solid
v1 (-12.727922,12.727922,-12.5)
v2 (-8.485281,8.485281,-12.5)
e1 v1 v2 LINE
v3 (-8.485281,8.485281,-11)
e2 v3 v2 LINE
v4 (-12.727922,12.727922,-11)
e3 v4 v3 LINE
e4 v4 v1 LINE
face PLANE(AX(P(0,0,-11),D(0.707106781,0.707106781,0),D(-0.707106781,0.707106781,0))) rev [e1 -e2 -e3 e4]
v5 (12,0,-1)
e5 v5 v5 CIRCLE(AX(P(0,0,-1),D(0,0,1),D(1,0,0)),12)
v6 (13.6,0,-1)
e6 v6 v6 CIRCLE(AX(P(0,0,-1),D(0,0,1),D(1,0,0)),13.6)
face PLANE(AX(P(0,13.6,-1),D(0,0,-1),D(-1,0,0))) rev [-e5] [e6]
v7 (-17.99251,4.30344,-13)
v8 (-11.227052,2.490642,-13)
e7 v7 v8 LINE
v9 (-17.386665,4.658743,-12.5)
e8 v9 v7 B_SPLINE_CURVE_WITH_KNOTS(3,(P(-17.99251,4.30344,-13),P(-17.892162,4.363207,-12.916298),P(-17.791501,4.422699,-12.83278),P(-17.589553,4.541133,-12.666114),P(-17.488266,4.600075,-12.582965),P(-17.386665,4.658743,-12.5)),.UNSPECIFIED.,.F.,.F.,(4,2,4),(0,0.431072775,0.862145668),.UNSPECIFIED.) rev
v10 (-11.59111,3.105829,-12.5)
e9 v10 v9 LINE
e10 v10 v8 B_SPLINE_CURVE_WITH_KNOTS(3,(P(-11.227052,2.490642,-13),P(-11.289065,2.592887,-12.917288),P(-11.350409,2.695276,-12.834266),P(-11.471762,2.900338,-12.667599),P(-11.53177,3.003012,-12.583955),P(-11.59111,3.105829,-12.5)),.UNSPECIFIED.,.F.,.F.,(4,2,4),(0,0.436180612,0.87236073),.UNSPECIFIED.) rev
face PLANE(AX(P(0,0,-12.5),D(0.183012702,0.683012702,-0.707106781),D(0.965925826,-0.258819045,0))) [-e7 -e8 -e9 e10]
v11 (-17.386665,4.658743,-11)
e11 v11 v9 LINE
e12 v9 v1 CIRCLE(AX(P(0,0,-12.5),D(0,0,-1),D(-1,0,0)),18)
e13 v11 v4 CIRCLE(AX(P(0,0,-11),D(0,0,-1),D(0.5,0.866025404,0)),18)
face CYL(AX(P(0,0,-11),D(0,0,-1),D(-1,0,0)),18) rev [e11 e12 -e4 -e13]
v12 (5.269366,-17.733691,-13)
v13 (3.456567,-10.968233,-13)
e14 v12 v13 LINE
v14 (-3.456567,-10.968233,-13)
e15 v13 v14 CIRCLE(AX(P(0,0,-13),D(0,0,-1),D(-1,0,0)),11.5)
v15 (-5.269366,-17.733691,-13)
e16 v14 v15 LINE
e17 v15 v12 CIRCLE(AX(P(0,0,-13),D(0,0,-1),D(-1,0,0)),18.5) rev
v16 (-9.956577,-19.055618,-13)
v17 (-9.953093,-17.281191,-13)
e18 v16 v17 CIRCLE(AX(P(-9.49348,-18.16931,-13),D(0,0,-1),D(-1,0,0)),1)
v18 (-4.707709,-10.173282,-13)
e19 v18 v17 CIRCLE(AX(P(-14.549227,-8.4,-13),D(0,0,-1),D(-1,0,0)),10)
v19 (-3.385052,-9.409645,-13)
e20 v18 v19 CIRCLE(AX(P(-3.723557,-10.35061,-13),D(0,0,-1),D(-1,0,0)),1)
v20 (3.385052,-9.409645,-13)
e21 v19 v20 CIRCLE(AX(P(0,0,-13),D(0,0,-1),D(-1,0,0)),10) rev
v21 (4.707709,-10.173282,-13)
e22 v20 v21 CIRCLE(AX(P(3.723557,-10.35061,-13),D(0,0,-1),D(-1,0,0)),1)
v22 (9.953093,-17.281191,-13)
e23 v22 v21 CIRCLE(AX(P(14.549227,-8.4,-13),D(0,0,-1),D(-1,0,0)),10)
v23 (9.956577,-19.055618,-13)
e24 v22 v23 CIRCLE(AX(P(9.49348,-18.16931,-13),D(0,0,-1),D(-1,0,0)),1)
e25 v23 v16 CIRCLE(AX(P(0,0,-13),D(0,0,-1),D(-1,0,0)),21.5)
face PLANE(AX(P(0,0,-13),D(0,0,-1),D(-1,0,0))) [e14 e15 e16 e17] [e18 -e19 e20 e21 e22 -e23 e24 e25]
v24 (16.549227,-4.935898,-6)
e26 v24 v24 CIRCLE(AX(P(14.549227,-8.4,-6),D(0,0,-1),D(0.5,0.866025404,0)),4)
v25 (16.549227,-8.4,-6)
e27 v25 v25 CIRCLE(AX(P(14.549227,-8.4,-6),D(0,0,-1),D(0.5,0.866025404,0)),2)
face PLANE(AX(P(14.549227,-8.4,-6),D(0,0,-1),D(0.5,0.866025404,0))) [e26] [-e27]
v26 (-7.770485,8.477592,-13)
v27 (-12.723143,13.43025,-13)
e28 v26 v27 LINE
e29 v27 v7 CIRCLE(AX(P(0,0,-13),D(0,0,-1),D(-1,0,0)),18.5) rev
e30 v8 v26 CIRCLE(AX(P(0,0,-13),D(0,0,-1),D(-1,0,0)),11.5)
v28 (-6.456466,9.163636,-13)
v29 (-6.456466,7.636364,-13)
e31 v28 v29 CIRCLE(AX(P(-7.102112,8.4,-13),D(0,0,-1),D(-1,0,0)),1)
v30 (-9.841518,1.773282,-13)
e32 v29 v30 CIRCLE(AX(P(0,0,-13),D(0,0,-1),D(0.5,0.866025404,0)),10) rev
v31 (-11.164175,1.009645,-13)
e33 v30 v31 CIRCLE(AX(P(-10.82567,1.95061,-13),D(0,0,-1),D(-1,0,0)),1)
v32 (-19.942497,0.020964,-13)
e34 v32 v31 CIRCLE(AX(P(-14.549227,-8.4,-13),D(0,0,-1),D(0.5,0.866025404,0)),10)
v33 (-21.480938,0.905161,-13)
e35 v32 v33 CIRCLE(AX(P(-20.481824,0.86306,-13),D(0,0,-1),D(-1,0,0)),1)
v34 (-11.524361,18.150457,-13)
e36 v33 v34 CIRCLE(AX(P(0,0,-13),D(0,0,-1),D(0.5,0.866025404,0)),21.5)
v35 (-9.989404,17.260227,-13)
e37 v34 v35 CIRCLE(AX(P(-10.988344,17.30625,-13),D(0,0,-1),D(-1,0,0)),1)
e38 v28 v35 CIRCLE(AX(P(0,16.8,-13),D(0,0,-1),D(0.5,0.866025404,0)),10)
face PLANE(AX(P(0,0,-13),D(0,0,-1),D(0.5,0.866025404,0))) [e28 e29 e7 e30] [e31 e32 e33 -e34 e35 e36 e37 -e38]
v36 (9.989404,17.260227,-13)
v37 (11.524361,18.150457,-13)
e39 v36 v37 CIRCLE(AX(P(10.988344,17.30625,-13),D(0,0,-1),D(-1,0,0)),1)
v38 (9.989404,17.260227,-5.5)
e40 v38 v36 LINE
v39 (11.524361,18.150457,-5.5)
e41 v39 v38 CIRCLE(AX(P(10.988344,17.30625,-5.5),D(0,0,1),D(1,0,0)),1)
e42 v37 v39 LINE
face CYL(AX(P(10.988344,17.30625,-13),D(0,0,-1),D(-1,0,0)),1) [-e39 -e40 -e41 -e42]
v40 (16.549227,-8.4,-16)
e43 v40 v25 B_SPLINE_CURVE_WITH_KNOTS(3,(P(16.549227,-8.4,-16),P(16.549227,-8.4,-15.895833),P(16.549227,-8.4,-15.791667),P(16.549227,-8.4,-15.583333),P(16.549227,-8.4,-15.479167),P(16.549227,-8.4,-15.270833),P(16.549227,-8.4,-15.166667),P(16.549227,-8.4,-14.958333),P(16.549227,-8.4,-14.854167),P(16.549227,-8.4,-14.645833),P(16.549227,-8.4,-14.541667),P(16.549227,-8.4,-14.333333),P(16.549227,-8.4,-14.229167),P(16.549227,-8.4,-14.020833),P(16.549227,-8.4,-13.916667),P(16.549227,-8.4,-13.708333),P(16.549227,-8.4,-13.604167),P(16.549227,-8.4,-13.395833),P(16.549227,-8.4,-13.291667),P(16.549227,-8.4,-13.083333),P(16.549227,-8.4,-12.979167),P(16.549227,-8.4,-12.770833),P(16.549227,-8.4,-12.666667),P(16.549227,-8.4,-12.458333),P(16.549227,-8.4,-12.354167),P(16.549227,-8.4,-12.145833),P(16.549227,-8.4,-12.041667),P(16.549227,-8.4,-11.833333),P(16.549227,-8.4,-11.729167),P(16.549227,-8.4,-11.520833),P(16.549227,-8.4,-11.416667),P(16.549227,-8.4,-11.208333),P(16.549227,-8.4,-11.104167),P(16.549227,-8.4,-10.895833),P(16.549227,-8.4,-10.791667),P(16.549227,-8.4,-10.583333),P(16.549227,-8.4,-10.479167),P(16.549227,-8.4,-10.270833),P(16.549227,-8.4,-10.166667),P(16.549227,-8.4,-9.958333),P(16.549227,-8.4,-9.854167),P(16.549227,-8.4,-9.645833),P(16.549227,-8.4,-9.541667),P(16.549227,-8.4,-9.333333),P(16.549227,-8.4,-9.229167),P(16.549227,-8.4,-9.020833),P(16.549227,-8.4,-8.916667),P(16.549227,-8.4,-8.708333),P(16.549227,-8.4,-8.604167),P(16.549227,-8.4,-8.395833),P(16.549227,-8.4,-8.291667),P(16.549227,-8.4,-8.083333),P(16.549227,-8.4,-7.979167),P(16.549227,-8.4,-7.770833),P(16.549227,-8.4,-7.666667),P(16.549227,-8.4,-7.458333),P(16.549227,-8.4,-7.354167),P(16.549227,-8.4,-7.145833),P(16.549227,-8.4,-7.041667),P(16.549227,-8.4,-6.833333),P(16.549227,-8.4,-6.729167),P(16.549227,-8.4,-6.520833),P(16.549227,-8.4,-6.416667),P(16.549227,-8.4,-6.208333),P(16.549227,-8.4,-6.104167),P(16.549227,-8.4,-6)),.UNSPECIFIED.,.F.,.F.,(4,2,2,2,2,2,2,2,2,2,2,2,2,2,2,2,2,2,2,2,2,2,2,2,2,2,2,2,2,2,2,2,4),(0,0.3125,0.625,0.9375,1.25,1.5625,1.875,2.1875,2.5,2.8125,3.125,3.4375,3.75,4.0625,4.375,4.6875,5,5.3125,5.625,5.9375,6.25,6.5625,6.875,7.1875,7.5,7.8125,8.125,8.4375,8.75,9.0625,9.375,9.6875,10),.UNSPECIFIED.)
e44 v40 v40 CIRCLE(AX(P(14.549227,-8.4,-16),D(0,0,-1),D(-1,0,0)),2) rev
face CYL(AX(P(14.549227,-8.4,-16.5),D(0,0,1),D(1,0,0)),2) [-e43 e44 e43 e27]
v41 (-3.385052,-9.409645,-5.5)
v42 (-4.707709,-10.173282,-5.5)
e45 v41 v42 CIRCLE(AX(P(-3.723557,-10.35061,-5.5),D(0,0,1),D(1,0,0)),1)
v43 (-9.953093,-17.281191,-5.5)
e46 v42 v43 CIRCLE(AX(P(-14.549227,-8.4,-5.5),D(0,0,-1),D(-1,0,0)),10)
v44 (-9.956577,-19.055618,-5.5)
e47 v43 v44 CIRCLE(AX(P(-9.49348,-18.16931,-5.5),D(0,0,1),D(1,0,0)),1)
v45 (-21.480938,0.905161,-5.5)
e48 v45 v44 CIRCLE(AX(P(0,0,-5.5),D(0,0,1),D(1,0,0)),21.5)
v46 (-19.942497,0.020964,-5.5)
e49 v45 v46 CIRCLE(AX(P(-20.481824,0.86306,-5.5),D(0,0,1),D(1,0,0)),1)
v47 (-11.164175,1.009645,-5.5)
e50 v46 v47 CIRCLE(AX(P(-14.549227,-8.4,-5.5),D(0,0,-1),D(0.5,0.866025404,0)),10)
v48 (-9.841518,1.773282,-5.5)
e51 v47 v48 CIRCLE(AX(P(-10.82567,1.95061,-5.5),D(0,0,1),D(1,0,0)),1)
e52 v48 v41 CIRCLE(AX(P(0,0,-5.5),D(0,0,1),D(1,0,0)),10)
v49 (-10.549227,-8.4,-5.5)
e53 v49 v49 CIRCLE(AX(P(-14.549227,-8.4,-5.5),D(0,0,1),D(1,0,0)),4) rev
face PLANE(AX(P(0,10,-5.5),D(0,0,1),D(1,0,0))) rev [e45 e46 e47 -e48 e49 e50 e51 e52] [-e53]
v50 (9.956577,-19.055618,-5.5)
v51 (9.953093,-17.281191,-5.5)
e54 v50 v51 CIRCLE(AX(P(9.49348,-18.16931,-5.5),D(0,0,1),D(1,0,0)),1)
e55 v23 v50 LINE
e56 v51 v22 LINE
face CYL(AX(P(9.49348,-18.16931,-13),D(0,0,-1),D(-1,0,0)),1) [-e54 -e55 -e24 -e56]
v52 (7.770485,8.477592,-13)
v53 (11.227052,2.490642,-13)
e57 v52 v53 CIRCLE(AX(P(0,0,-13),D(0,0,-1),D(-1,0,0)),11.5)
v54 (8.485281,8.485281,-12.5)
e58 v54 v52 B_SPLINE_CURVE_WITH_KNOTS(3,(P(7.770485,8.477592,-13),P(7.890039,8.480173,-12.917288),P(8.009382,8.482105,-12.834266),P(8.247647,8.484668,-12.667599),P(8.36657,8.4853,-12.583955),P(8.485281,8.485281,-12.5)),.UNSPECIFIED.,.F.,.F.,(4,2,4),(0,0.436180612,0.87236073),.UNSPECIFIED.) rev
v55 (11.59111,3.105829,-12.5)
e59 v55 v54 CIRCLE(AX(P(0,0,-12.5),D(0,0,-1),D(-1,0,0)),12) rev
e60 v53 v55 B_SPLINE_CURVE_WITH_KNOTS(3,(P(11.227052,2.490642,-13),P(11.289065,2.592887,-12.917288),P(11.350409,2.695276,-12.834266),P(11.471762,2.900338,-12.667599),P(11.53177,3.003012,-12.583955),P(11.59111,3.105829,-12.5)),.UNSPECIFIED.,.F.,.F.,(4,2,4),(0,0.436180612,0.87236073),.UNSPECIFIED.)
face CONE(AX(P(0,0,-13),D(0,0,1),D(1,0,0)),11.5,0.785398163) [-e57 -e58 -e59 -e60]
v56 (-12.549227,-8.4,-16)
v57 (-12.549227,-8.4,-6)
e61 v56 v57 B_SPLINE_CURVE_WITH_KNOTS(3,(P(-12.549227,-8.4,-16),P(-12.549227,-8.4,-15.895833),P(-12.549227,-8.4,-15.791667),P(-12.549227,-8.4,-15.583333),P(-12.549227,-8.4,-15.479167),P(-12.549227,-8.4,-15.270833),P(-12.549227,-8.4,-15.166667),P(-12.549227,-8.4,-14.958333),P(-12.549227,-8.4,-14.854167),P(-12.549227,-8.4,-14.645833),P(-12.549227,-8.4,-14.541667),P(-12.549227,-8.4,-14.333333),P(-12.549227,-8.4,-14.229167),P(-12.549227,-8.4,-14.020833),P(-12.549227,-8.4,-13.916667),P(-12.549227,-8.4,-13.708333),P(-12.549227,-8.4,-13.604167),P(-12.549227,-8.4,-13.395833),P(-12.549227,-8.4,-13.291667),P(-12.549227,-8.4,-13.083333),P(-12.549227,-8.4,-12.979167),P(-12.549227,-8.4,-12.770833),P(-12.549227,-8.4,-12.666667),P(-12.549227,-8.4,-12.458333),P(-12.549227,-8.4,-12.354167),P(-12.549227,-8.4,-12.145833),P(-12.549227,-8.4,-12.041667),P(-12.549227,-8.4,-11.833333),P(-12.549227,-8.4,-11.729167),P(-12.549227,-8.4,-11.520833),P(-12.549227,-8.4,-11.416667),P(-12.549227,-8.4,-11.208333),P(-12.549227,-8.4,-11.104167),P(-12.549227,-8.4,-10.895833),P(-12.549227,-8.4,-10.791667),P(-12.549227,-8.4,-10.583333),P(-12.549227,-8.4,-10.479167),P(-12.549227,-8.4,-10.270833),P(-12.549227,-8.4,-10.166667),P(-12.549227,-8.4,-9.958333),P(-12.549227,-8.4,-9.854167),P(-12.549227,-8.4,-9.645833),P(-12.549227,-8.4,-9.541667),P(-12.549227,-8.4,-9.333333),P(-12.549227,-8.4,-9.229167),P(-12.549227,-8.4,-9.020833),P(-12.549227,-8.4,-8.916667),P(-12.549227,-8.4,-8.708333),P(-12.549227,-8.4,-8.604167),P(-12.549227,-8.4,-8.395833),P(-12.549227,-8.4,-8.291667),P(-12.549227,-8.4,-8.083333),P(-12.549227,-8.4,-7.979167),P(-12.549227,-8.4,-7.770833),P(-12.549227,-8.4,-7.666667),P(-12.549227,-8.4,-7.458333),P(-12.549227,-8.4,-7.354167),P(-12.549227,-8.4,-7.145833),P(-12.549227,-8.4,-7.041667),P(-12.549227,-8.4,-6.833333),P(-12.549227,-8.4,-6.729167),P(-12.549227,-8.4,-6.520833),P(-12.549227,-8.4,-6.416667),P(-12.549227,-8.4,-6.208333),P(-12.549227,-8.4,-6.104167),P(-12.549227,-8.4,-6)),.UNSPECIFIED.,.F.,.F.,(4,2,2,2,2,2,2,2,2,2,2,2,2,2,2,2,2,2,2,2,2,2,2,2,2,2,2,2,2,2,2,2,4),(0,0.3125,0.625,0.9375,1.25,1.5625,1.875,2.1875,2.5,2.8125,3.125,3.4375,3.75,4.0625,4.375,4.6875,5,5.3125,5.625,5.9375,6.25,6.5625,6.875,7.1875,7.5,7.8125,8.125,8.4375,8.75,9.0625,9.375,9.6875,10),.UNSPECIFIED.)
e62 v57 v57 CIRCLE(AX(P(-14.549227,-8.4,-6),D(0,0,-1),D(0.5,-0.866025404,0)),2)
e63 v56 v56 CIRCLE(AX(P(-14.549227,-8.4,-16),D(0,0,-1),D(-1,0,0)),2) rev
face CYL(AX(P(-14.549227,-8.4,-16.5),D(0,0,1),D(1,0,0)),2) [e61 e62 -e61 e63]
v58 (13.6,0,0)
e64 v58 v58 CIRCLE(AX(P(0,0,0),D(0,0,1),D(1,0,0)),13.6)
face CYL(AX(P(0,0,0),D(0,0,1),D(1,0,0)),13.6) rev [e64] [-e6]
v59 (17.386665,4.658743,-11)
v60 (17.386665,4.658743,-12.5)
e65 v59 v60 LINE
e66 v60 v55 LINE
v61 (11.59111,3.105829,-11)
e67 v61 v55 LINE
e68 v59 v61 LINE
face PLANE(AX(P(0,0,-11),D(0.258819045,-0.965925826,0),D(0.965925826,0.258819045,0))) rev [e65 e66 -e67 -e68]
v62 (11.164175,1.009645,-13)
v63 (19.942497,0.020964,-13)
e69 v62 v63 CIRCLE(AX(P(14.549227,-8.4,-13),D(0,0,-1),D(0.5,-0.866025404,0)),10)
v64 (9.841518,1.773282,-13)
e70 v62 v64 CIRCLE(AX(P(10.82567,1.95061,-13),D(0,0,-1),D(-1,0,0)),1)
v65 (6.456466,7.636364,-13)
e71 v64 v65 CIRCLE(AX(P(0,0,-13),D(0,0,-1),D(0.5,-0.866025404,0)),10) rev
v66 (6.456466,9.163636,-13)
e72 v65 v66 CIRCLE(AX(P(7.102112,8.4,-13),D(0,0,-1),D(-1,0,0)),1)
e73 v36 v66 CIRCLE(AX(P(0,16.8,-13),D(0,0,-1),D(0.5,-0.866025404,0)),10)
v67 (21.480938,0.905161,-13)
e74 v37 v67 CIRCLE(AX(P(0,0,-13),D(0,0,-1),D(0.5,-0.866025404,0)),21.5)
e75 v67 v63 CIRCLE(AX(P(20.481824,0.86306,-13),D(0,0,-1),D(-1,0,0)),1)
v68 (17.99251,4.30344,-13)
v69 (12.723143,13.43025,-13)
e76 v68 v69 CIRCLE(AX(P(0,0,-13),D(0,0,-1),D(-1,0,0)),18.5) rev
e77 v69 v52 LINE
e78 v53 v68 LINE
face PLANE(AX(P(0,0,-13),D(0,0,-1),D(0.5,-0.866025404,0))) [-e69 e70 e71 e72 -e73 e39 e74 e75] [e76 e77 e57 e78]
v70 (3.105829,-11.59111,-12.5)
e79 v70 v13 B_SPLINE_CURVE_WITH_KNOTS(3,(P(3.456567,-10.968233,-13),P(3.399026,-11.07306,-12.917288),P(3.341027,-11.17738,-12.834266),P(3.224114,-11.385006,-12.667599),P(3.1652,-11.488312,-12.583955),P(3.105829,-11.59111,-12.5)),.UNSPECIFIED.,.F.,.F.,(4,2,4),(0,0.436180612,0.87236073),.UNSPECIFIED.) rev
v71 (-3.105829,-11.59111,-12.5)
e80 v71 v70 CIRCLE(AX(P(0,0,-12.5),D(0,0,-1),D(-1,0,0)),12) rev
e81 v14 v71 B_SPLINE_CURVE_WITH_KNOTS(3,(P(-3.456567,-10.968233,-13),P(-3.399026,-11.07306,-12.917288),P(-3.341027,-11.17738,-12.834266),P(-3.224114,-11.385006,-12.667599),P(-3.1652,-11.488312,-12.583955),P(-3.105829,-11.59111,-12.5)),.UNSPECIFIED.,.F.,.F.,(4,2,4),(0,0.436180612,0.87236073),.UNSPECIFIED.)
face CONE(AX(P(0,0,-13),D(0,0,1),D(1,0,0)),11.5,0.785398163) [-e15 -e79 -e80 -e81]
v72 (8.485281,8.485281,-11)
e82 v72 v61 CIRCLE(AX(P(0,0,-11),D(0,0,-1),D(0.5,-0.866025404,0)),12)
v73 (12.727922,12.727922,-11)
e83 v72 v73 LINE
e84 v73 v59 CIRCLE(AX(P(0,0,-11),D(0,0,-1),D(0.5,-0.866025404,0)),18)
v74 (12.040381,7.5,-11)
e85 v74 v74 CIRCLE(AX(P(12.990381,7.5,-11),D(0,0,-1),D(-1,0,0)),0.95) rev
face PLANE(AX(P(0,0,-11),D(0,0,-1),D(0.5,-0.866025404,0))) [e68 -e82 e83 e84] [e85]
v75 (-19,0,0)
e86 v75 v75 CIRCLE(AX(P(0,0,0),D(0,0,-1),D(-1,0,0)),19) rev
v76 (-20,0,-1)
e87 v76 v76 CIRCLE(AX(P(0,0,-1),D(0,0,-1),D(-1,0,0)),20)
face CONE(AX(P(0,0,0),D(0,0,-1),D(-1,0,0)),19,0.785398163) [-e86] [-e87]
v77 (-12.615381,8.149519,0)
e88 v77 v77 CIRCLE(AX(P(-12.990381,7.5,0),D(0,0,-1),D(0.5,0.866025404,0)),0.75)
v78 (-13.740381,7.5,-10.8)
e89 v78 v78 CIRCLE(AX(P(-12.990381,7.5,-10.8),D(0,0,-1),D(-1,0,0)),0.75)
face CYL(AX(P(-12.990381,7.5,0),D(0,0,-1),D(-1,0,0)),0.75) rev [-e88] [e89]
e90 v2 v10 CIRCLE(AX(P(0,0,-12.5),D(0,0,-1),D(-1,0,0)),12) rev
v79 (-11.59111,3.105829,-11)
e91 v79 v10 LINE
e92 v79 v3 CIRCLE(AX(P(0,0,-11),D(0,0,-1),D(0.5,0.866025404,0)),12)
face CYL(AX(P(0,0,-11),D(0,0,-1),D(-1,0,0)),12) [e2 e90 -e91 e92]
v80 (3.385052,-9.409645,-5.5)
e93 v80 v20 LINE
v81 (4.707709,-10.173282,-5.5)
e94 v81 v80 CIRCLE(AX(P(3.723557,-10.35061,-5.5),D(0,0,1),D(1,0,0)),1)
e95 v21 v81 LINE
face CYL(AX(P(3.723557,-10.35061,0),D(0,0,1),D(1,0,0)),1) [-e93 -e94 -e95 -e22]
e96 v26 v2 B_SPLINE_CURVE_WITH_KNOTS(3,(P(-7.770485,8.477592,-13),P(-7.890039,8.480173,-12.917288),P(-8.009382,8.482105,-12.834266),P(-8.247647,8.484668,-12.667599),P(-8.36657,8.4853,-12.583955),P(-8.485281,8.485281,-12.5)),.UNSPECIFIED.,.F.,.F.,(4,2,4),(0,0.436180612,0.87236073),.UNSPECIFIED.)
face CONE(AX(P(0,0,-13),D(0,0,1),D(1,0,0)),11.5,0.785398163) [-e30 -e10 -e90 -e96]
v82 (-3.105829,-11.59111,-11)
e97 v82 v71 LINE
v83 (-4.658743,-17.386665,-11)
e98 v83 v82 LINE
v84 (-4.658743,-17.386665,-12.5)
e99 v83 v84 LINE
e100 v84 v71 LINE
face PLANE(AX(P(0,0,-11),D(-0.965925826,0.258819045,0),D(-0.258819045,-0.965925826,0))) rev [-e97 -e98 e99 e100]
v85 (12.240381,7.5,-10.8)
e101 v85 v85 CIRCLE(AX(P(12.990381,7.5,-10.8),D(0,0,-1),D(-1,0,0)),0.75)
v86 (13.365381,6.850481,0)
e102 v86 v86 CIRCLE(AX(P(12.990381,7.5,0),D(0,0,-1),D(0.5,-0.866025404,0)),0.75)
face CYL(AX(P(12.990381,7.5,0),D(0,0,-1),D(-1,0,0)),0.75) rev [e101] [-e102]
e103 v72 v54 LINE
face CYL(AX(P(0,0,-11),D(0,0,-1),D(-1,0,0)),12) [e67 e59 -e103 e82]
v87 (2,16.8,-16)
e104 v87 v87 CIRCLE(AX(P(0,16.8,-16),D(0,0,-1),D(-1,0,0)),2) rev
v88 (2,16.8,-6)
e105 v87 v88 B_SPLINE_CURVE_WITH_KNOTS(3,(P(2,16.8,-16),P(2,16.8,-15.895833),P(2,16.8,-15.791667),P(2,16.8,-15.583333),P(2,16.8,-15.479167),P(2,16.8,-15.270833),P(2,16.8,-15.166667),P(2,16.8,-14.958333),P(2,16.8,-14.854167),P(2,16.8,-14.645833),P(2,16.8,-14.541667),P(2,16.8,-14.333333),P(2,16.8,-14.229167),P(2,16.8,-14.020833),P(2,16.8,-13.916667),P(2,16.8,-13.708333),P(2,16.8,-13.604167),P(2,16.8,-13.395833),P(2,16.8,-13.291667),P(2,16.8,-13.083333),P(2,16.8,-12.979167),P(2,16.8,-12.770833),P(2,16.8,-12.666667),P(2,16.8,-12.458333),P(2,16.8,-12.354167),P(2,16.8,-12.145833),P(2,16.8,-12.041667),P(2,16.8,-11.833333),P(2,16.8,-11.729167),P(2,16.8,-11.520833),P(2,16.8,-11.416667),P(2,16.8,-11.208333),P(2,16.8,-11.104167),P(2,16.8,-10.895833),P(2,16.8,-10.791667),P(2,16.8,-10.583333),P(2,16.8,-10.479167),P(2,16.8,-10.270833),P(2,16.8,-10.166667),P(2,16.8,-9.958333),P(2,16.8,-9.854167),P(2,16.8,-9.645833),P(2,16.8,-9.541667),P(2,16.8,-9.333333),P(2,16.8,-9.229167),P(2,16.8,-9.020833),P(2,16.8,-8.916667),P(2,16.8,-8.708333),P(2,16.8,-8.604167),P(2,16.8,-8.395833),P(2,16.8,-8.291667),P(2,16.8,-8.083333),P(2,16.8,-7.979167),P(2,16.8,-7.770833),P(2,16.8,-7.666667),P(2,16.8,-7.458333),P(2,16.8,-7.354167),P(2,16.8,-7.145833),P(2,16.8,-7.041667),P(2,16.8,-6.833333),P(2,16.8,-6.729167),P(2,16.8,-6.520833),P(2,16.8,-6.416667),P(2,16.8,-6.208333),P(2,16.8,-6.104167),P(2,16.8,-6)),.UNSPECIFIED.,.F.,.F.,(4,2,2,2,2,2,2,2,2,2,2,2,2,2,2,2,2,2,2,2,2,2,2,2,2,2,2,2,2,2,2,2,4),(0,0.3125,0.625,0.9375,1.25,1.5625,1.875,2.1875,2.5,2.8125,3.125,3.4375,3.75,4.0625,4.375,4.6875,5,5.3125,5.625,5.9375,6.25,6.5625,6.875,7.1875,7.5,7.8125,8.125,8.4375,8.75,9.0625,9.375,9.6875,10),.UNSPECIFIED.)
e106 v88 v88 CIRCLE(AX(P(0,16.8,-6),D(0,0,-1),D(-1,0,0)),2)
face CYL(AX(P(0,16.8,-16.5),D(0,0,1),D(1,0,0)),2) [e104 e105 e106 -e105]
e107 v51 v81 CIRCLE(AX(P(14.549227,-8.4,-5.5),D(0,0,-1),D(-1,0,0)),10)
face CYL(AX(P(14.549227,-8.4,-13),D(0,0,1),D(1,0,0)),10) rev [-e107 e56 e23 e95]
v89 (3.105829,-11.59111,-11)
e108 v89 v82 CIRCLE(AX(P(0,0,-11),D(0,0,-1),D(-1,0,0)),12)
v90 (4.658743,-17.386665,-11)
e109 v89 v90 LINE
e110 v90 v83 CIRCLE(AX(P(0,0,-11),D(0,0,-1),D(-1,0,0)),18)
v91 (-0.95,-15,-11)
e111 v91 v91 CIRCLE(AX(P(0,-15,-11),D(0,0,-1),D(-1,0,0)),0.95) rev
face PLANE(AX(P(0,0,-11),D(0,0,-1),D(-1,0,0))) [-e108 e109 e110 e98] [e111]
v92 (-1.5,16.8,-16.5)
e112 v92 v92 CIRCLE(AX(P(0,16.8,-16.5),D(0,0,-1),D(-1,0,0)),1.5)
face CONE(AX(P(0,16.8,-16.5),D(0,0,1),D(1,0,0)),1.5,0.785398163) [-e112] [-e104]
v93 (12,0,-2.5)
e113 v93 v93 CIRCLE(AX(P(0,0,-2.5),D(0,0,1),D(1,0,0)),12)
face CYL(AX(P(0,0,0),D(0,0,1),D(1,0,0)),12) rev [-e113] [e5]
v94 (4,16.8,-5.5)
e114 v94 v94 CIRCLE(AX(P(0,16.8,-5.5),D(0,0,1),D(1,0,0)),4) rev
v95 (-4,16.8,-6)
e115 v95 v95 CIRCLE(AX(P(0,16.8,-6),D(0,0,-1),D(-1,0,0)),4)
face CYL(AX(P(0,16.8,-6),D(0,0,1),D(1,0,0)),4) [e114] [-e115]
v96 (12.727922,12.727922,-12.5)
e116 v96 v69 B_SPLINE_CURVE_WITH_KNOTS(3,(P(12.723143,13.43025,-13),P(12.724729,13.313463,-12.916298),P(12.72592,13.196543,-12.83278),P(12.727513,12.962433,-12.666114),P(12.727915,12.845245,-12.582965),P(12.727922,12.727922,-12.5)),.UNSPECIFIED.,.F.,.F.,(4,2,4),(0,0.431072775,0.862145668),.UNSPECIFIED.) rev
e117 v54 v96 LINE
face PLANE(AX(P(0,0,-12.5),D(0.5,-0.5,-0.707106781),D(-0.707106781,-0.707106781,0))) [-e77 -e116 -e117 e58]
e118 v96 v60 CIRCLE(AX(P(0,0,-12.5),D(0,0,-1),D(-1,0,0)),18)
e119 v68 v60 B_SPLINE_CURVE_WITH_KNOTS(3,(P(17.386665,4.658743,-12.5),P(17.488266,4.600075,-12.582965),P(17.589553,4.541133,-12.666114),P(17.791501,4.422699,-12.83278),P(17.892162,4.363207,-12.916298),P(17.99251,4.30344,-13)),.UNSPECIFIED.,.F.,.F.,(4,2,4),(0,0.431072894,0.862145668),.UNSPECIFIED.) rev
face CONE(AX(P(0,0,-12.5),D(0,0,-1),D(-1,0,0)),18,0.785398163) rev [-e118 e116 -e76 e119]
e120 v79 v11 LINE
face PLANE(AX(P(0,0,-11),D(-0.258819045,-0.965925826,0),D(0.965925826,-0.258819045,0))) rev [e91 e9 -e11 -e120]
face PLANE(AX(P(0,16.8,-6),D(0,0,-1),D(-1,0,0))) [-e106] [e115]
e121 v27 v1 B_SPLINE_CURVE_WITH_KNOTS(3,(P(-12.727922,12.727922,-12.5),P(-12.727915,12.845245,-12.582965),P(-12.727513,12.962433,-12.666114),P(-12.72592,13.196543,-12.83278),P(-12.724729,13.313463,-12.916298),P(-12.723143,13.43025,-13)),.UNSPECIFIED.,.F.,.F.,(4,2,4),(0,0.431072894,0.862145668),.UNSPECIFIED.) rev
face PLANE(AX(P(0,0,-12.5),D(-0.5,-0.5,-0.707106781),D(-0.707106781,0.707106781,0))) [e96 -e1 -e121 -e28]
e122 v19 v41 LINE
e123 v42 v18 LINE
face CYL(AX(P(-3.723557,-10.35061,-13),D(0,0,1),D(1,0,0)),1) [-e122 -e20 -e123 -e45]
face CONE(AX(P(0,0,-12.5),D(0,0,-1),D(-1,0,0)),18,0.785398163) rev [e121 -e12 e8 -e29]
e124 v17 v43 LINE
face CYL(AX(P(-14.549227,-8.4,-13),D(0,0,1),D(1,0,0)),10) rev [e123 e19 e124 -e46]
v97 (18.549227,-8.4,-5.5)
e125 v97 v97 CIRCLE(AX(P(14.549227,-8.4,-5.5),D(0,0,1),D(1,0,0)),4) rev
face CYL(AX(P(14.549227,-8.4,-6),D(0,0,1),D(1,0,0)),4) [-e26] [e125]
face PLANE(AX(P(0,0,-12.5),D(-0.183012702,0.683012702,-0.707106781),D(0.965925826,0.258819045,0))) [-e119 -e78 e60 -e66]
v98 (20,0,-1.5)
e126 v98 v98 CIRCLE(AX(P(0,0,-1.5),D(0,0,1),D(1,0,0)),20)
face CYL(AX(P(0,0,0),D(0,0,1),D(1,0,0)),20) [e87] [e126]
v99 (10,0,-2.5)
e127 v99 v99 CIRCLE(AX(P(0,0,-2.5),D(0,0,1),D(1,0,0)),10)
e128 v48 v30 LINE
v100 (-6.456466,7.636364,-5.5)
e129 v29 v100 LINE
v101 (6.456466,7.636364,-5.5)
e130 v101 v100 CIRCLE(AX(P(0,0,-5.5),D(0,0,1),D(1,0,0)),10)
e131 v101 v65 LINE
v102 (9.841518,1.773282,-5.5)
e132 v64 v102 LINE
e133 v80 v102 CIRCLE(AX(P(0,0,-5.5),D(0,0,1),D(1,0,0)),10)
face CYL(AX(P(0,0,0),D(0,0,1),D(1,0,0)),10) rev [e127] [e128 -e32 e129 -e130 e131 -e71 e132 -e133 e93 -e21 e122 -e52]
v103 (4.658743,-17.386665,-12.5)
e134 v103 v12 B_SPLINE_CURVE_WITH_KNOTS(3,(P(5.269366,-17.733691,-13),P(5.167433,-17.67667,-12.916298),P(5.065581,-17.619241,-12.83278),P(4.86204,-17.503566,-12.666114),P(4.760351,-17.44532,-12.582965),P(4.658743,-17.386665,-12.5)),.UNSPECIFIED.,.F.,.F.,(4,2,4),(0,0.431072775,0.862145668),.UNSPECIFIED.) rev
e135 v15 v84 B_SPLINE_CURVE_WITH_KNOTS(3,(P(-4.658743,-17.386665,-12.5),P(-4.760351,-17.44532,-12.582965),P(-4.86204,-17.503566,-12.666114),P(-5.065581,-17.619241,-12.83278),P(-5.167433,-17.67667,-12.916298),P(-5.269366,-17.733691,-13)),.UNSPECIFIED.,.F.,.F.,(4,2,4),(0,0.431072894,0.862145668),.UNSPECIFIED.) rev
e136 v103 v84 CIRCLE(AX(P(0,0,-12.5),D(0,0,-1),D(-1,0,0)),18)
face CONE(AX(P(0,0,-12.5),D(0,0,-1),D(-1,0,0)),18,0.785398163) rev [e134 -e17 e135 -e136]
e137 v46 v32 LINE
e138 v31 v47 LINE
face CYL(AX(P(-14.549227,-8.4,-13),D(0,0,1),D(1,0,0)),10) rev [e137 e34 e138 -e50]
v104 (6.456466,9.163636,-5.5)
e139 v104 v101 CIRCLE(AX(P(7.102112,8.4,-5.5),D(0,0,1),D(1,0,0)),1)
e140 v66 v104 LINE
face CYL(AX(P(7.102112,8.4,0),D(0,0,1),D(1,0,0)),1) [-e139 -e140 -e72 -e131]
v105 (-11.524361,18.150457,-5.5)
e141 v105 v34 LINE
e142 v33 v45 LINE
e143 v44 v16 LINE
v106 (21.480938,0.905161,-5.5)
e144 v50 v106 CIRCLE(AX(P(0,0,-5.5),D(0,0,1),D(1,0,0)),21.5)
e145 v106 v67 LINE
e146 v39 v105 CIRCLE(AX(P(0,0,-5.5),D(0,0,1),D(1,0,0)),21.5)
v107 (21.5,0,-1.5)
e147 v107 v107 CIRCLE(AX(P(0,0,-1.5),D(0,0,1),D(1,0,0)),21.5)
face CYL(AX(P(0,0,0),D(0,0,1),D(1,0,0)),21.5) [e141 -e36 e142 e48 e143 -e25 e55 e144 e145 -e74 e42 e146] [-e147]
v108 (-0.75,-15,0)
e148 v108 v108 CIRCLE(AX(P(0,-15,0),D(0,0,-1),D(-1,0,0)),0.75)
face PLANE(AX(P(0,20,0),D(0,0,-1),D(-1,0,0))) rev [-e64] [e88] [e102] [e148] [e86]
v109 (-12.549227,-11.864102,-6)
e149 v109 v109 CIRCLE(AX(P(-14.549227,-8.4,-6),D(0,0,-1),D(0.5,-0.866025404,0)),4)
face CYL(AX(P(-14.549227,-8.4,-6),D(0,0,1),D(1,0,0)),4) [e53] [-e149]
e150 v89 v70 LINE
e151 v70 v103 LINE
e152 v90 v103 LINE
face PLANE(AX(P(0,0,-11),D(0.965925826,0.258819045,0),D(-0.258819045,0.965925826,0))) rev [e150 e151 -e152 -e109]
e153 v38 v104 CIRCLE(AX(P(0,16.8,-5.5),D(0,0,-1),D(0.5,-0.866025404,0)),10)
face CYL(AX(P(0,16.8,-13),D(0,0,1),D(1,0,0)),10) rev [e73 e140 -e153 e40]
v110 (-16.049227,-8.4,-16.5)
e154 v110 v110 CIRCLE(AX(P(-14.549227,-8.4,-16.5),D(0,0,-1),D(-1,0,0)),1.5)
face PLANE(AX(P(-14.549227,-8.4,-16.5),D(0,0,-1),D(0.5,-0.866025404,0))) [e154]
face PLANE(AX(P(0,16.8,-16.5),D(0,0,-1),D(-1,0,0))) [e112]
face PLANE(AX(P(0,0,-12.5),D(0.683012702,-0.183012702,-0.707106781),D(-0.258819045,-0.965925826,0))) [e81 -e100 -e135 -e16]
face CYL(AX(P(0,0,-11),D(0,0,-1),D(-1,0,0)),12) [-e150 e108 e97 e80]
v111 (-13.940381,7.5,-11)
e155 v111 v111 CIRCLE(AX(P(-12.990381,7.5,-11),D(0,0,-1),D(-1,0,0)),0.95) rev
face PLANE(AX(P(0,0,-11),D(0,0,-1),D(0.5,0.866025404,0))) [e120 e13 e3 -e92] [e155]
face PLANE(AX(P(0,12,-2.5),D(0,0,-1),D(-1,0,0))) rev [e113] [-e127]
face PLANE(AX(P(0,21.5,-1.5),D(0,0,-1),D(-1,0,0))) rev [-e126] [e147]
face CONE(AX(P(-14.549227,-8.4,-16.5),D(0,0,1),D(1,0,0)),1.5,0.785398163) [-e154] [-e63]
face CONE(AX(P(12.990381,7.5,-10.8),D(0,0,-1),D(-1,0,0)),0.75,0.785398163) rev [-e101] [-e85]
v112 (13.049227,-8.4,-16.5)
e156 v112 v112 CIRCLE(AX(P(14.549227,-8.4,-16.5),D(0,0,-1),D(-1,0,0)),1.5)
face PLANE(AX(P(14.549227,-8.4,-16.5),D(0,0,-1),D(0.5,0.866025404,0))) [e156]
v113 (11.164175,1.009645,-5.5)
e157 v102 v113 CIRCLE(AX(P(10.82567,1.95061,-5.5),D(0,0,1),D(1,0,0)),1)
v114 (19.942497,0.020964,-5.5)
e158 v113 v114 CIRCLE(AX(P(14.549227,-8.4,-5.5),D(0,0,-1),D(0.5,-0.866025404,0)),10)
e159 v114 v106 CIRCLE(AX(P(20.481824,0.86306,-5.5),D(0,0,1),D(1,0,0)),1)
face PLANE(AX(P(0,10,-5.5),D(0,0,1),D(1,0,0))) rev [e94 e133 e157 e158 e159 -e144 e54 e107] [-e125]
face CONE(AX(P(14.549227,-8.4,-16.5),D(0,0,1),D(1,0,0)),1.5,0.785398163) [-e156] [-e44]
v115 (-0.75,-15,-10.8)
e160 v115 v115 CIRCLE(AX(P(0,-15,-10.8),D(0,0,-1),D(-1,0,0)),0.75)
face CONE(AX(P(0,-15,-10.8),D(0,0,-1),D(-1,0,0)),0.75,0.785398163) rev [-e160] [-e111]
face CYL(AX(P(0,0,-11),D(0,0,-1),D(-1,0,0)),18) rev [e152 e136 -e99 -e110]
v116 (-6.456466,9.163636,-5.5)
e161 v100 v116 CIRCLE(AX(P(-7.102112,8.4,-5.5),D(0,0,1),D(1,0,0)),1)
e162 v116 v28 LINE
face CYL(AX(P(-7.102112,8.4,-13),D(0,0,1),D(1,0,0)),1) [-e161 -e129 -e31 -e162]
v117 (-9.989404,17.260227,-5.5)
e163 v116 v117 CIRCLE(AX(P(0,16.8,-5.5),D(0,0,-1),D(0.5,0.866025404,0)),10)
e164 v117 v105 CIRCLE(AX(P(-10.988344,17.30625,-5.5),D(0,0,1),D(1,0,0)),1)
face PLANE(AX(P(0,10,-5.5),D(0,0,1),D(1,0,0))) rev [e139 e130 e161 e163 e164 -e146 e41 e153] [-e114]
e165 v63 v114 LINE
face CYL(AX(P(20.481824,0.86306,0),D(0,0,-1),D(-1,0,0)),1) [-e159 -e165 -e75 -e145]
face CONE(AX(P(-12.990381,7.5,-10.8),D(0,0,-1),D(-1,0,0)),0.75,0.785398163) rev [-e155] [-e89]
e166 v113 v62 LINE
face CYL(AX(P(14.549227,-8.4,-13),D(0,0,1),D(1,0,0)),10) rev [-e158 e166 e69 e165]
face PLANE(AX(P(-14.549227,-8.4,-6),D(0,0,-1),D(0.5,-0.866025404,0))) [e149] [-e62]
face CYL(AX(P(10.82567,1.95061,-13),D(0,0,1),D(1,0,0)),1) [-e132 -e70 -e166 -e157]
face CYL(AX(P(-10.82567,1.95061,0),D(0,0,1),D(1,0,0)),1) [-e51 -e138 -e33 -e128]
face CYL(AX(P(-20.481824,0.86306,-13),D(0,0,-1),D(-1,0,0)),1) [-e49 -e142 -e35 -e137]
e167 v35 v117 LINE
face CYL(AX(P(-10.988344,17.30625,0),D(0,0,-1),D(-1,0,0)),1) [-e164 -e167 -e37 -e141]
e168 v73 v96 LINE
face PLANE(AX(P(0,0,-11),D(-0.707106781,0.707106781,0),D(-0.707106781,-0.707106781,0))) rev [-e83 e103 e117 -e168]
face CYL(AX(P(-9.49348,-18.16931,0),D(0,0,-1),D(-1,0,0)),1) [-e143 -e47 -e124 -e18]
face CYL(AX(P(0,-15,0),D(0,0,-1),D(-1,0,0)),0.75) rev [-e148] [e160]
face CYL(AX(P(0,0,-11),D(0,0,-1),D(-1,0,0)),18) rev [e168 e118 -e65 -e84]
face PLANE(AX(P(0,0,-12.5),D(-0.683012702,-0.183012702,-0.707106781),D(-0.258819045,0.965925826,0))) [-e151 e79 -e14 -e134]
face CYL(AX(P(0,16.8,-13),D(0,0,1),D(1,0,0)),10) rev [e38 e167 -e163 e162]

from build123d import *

# Parameters (mm, degrees)
SKETCH4_R                    = 4
BOSS_EXTRUDE1_DEPTH          = 0.5
SKETCH5_R                    = 2
BOSS_EXTRUDE2_DEPTH          = 10.5
CHAMFER1_SIZE                = 0.5
CIRPATTERN1_COUNT            = 3
CHAMFER1_OF_CIRPATTERN1_SIZE = 0.5
BOSS_EXTRUDE3_DEPTH          = 7.5
SKETCH7_R                    = 0.75
CUT_EXTRUDE1_DEPTH           = 2
CUT_EXTRUDE2_DEPTH           = 34.068111528
CHAMFER2_SIZE                = 0.2
CHAMFER3_SIZE                = 0.5
CIRPATTERN2_COUNT            = 3
CHAMFER2_OF_CIRPATTERN2_SIZE = 0.2
CHAMFER3_OF_CIRPATTERN2_SIZE = 0.5
CHAMFER4_SIZE                = 1
FILLET1_R                    = 1


with BuildPart() as part:
    # Sketch3 → Revolve1 (revolve)
    with BuildSketch(Plane(origin=(0, 0, 0), x_dir=(0, 0, -1), z_dir=(1, 0, 0)), mode=Mode.PRIVATE) as revolve1_sk:
        Polygon((1, 13.6), (1, 12), (2.5, 12), (2.5, 10), (5.5, 10), (5.5, 21.5), (1.5, 21.5), (1.5, 20), (0, 20), (0, 13.6), align=None)
    revolve(revolve1_sk.sketch.rotate(Axis((0, 0, 0), (0, 0, -1)), 90), axis=Axis((0, 0, 0), (0, 0, -1)))

    # Sketch4 → Boss-Extrude1 (add)
    with BuildSketch(Plane(origin=(0, 0, -5.5), x_dir=(-1, 0, 0), z_dir=(0, 0, -1))):
        with Locations(Location((0, 16.8, 0), (0, 0, 180))):
            Circle(SKETCH4_R)
    boss_extrude1 = extrude(amount=BOSS_EXTRUDE1_DEPTH)

    # Sketch5 → Boss-Extrude2 (add)
    with BuildSketch(Plane(origin=(0, 0, -6), x_dir=(-1, 0, 0), z_dir=(0, 0, -1))):
        with Locations(Location((0, 16.8, 0), (0, 0, 180))):
            Circle(SKETCH5_R)
    boss_extrude2 = extrude(amount=BOSS_EXTRUDE2_DEPTH)

    # Chamfer1
    chamfer1_edges = [part.edges().sort_by_distance(p)[0] for p in [
        (-2, 16.8, -16.5),
    ]]
    chamfer(chamfer1_edges, length=CHAMFER1_SIZE)

    # CirPattern1: Boss-Extrude1, Boss-Extrude2 ×3 about axis
    cirpattern1_axis = Axis((0, 0, 0), (0, 0, 1))
    add([boss_extrude1.rotate(cirpattern1_axis, i * 360 / CIRPATTERN1_COUNT) for i in range(1, CIRPATTERN1_COUNT)])
    add([boss_extrude2.rotate(cirpattern1_axis, i * 360 / CIRPATTERN1_COUNT) for i in range(1, CIRPATTERN1_COUNT)])

    # Chamfer1 of CirPattern1
    chamfer1_of_cirpattern1_edges = [part.edges().sort_by_distance(p)[0] for p in [
        (-13.549226784, -10.132050808, -16.5),
        (15.549226784, -6.667949192, -16.5),
    ]]
    chamfer(chamfer1_of_cirpattern1_edges, length=CHAMFER1_OF_CIRPATTERN1_SIZE)

    # Sketch6 → Boss-Extrude3 (add)
    with BuildSketch(Plane(origin=(0, 0, -5.5), x_dir=(-1, 0, 0), z_dir=(0, 0, -1))):
        with BuildLine():
            ThreePointArc((-4.561681399, -8.89893605), (-6.703398823, -14.60024061), (-11.755277198, -18.001762636))
            ThreePointArc((-11.755277198, -18.001762636), (0, -21.5), (11.755277198, -18.001762636))
            ThreePointArc((11.755277198, -18.001762636), (6.703398823, -14.60024061), (4.561681399, -8.89893605))
            ThreePointArc((4.561681399, -8.89893605), (0, -10), (-4.561681399, -8.89893605))
        make_face()
    boss_extrude3 = extrude(amount=BOSS_EXTRUDE3_DEPTH)

    # Sketch7 → Cut-Extrude1 (cut)
    with BuildSketch(Plane(origin=(0, 0, -13), x_dir=(-1, 0, 0), z_dir=(0, 0, -1))):
        with BuildLine():
            Line((-3.105828541, -11.591109915), (-4.658742812, -17.386664873))
            ThreePointArc((-4.658742812, -17.386664873), (0, -18), (4.658742812, -17.386664873))
            Line((4.658742812, -17.386664873), (3.105828541, -11.591109915))
            ThreePointArc((3.105828541, -11.591109915), (0, -12), (-3.105828541, -11.591109915))
        make_face()
        with Locations((0, -15)):
            Circle(SKETCH7_R, mode=Mode.SUBTRACT)
    cut_extrude1 = extrude(amount=-CUT_EXTRUDE1_DEPTH, mode=Mode.SUBTRACT)

    # Sketch7<3> → Cut-Extrude2 (cut, through all)
    with BuildSketch(Plane(origin=(0, 0, -13), x_dir=(-1, 0, 0), z_dir=(0, 0, -1))):
        with BuildLine():
            ThreePointArc((0.75, -15), (0.530330086, -14.469669914), (0, -14.25))
            Line((0, -14.25), (0, -15.75))
            ThreePointArc((0, -15.75), (0.530330086, -15.530330086), (0.75, -15))
        make_face()
        with BuildLine():
            Line((0, -15.75), (0, -14.25))
            ThreePointArc((0, -14.25), (-0.75, -15), (0, -15.75))
        make_face()
    cut_extrude2 = extrude(amount=-CUT_EXTRUDE2_DEPTH, mode=Mode.SUBTRACT)

    # Chamfer2
    chamfer2_edges = [part.edges().sort_by_distance(p)[0] for p in [
        (0, -15.75, -11),
    ]]
    chamfer(chamfer2_edges, length=CHAMFER2_SIZE)

    # Chamfer3
    chamfer3_edges = [part.edges().sort_by_distance(p)[0] for p in [
        (0, -12, -13),
        (3.882285677, -14.488887394, -13),
        (0, -18, -13),
        (-3.882285677, -14.488887394, -13),
    ]]
    chamfer(chamfer3_edges, length=CHAMFER3_SIZE)

    # CirPattern2: Boss-Extrude3, Cut-Extrude1, Cut-Extrude2 ×3 about axis
    cirpattern2_axis = Axis((0, 0, 0), (0, 0, 1))
    add([boss_extrude3.rotate(cirpattern2_axis, i * 360 / CIRPATTERN2_COUNT) for i in range(1, CIRPATTERN2_COUNT)])
    add([cut_extrude1.rotate(cirpattern2_axis, i * 360 / CIRPATTERN2_COUNT) for i in range(1, CIRPATTERN2_COUNT)], mode=Mode.SUBTRACT)
    add([cut_extrude2.rotate(cirpattern2_axis, i * 360 / CIRPATTERN2_COUNT) for i in range(1, CIRPATTERN2_COUNT)], mode=Mode.SUBTRACT)

    # Chamfer2 of CirPattern2
    chamfer2_of_cirpattern2_edges = [part.edges().sort_by_distance(p)[0] for p in [
        (13.63990011, 7.875, -11),
        (-13.63990011, 7.875, -11),
    ]]
    chamfer(chamfer2_of_cirpattern2_edges, length=CHAMFER2_OF_CIRPATTERN2_SIZE)

    # Chamfer3 of CirPattern2
    chamfer3_of_cirpattern2_edges = [part.edges().sort_by_distance(p)[0] for p in [
        (10.392304845, 6, -13),
        (10.606601718, 10.606601718, -13),
        (15.588457268, 9, -13),
        (14.488887394, 3.882285677, -13),
        (-10.392304845, 6, -13),
        (-14.488887394, 3.882285677, -13),
        (-15.588457268, 9, -13),
        (-10.606601718, 10.606601718, -13),
    ]]
    chamfer(chamfer3_of_cirpattern2_edges, length=CHAMFER3_OF_CIRPATTERN2_SIZE)

    # Chamfer4
    chamfer4_edges = [part.edges().sort_by_distance(p)[0] for p in [
        (-20, 0, 0),
    ]]
    chamfer(chamfer4_edges, length=CHAMFER4_SIZE)

    # Fillet1
    # the kernel refuses this fillet: 1 mm, written as the material it takes off along each edge
    with BuildSketch(Plane(origin=(21.467622355, -1.179487364, -5.5), x_dir=(0.006387197521753026, 0.9999796016458627, 0), z_dir=(0, 0, -1)), Plane(origin=(-9.712345156, 19.18125, -5.5), x_dir=(-0.8692013370524359, -0.4944583255101058, 0), z_dir=(0, 0, -1)), Plane(origin=(-11.755277198, -18.001762636, -5.5), x_dir=(0.8628141395306828, -0.5055212761357604, 0), z_dir=(0, 0, -1))) as fillet1_piece_1:
        with BuildLine():
            CenterArc((2.036209541, -0.998824096), FILLET1_R, 87.221143718, 125.050734124)
            ThreePointArc((1.190685537, -1.532761506), (0.632617432, -0.737424909), (0, 0))
            ThreePointArc((0, 0), (1.04234536, 0.025281931), (2.084690721, 0))
        make_face()
    extrude(amount=12.711726802, mode=Mode.SUBTRACT)
    with BuildSketch(Plane(origin=(9.987545385, 0.49893605, -5.5), x_dir=(0.917317562643698, 0.39815636283428313, 0), z_dir=(0, 0, -1)), Plane(origin=(-5.425863987, 8.4, -5.5), x_dir=(-0.8034723062147525, 0.5953421311699238, 0), z_dir=(0, 0, -1)), Plane(origin=(-4.561681399, -8.89893605, -5.5), x_dir=(-0.113845256428944, -0.9934984940042073, 0), z_dir=(0, 0, -1))) as fillet1_piece_2:
        with BuildLine():
            CenterArc((1.346819148, -0.99794128), FILLET1_R, 93.677145319, 99.571657965)
            ThreePointArc((0.373435102, -1.22712134), (0.20641295, -0.607567006), (0, 0))
            ThreePointArc((0, 0), (0.641342451, -0.020587199), (1.282684903, 0))
        make_face()
    extrude(amount=10.706712257, mode=Mode.SUBTRACT)
    with BuildSketch(Plane(origin=(5.425863987, 8.4, -5.5), x_dir=(0.8034723062147446, 0.5953421311699345, 0), z_dir=(0, 0, -1)), Plane(origin=(-9.987545385, 0.49893605, -5.5), x_dir=(-0.9173175626437023, 0.3981563628342732, 0), z_dir=(0, 0, -1)), Plane(origin=(4.561681399, -8.89893605, -5.5), x_dir=(0.11384525642895783, -0.9934984940042058, 0), z_dir=(0, 0, -1))) as fillet1_piece_3:
        with BuildLine():
            CenterArc((1.346819148, 0.99794128), FILLET1_R, 166.751196715, 99.571657965)
            ThreePointArc((0.373435102, 1.22712134), (0.20641295, 0.607567006), (0, 0))
            ThreePointArc((0, 0), (0.641342451, 0.020587199), (1.282684903, 0))
        make_face()
    extrude(amount=10.706712257, mode=Mode.SUBTRACT)
    with BuildSketch(Plane(origin=(9.712345156, 19.18125, -5.5), x_dir=(0.8692013370524442, -0.49445832551009133, 0), z_dir=(0, 0, -1)), Plane(origin=(-21.467622355, -1.179487364, -5.5), x_dir=(-0.006387197521764941, 0.9999796016458625, 0), z_dir=(0, 0, -1)), Plane(origin=(11.755277198, -18.001762636, -5.5), x_dir=(-0.8628141395306764, -0.5055212761357711, 0), z_dir=(0, 0, -1))) as fillet1_piece_4:
        with BuildLine():
            CenterArc((2.036209541, 0.998824096), FILLET1_R, 147.728122158, 125.050734124)
            ThreePointArc((1.190685537, 1.532761506), (0.632617432, 0.737424909), (0, 0))
            ThreePointArc((0, 0), (1.04234536, -0.025281931), (2.084690721, 0))
        make_face()
    extrude(amount=12.711726802, mode=Mode.SUBTRACT)


solid = part.part
